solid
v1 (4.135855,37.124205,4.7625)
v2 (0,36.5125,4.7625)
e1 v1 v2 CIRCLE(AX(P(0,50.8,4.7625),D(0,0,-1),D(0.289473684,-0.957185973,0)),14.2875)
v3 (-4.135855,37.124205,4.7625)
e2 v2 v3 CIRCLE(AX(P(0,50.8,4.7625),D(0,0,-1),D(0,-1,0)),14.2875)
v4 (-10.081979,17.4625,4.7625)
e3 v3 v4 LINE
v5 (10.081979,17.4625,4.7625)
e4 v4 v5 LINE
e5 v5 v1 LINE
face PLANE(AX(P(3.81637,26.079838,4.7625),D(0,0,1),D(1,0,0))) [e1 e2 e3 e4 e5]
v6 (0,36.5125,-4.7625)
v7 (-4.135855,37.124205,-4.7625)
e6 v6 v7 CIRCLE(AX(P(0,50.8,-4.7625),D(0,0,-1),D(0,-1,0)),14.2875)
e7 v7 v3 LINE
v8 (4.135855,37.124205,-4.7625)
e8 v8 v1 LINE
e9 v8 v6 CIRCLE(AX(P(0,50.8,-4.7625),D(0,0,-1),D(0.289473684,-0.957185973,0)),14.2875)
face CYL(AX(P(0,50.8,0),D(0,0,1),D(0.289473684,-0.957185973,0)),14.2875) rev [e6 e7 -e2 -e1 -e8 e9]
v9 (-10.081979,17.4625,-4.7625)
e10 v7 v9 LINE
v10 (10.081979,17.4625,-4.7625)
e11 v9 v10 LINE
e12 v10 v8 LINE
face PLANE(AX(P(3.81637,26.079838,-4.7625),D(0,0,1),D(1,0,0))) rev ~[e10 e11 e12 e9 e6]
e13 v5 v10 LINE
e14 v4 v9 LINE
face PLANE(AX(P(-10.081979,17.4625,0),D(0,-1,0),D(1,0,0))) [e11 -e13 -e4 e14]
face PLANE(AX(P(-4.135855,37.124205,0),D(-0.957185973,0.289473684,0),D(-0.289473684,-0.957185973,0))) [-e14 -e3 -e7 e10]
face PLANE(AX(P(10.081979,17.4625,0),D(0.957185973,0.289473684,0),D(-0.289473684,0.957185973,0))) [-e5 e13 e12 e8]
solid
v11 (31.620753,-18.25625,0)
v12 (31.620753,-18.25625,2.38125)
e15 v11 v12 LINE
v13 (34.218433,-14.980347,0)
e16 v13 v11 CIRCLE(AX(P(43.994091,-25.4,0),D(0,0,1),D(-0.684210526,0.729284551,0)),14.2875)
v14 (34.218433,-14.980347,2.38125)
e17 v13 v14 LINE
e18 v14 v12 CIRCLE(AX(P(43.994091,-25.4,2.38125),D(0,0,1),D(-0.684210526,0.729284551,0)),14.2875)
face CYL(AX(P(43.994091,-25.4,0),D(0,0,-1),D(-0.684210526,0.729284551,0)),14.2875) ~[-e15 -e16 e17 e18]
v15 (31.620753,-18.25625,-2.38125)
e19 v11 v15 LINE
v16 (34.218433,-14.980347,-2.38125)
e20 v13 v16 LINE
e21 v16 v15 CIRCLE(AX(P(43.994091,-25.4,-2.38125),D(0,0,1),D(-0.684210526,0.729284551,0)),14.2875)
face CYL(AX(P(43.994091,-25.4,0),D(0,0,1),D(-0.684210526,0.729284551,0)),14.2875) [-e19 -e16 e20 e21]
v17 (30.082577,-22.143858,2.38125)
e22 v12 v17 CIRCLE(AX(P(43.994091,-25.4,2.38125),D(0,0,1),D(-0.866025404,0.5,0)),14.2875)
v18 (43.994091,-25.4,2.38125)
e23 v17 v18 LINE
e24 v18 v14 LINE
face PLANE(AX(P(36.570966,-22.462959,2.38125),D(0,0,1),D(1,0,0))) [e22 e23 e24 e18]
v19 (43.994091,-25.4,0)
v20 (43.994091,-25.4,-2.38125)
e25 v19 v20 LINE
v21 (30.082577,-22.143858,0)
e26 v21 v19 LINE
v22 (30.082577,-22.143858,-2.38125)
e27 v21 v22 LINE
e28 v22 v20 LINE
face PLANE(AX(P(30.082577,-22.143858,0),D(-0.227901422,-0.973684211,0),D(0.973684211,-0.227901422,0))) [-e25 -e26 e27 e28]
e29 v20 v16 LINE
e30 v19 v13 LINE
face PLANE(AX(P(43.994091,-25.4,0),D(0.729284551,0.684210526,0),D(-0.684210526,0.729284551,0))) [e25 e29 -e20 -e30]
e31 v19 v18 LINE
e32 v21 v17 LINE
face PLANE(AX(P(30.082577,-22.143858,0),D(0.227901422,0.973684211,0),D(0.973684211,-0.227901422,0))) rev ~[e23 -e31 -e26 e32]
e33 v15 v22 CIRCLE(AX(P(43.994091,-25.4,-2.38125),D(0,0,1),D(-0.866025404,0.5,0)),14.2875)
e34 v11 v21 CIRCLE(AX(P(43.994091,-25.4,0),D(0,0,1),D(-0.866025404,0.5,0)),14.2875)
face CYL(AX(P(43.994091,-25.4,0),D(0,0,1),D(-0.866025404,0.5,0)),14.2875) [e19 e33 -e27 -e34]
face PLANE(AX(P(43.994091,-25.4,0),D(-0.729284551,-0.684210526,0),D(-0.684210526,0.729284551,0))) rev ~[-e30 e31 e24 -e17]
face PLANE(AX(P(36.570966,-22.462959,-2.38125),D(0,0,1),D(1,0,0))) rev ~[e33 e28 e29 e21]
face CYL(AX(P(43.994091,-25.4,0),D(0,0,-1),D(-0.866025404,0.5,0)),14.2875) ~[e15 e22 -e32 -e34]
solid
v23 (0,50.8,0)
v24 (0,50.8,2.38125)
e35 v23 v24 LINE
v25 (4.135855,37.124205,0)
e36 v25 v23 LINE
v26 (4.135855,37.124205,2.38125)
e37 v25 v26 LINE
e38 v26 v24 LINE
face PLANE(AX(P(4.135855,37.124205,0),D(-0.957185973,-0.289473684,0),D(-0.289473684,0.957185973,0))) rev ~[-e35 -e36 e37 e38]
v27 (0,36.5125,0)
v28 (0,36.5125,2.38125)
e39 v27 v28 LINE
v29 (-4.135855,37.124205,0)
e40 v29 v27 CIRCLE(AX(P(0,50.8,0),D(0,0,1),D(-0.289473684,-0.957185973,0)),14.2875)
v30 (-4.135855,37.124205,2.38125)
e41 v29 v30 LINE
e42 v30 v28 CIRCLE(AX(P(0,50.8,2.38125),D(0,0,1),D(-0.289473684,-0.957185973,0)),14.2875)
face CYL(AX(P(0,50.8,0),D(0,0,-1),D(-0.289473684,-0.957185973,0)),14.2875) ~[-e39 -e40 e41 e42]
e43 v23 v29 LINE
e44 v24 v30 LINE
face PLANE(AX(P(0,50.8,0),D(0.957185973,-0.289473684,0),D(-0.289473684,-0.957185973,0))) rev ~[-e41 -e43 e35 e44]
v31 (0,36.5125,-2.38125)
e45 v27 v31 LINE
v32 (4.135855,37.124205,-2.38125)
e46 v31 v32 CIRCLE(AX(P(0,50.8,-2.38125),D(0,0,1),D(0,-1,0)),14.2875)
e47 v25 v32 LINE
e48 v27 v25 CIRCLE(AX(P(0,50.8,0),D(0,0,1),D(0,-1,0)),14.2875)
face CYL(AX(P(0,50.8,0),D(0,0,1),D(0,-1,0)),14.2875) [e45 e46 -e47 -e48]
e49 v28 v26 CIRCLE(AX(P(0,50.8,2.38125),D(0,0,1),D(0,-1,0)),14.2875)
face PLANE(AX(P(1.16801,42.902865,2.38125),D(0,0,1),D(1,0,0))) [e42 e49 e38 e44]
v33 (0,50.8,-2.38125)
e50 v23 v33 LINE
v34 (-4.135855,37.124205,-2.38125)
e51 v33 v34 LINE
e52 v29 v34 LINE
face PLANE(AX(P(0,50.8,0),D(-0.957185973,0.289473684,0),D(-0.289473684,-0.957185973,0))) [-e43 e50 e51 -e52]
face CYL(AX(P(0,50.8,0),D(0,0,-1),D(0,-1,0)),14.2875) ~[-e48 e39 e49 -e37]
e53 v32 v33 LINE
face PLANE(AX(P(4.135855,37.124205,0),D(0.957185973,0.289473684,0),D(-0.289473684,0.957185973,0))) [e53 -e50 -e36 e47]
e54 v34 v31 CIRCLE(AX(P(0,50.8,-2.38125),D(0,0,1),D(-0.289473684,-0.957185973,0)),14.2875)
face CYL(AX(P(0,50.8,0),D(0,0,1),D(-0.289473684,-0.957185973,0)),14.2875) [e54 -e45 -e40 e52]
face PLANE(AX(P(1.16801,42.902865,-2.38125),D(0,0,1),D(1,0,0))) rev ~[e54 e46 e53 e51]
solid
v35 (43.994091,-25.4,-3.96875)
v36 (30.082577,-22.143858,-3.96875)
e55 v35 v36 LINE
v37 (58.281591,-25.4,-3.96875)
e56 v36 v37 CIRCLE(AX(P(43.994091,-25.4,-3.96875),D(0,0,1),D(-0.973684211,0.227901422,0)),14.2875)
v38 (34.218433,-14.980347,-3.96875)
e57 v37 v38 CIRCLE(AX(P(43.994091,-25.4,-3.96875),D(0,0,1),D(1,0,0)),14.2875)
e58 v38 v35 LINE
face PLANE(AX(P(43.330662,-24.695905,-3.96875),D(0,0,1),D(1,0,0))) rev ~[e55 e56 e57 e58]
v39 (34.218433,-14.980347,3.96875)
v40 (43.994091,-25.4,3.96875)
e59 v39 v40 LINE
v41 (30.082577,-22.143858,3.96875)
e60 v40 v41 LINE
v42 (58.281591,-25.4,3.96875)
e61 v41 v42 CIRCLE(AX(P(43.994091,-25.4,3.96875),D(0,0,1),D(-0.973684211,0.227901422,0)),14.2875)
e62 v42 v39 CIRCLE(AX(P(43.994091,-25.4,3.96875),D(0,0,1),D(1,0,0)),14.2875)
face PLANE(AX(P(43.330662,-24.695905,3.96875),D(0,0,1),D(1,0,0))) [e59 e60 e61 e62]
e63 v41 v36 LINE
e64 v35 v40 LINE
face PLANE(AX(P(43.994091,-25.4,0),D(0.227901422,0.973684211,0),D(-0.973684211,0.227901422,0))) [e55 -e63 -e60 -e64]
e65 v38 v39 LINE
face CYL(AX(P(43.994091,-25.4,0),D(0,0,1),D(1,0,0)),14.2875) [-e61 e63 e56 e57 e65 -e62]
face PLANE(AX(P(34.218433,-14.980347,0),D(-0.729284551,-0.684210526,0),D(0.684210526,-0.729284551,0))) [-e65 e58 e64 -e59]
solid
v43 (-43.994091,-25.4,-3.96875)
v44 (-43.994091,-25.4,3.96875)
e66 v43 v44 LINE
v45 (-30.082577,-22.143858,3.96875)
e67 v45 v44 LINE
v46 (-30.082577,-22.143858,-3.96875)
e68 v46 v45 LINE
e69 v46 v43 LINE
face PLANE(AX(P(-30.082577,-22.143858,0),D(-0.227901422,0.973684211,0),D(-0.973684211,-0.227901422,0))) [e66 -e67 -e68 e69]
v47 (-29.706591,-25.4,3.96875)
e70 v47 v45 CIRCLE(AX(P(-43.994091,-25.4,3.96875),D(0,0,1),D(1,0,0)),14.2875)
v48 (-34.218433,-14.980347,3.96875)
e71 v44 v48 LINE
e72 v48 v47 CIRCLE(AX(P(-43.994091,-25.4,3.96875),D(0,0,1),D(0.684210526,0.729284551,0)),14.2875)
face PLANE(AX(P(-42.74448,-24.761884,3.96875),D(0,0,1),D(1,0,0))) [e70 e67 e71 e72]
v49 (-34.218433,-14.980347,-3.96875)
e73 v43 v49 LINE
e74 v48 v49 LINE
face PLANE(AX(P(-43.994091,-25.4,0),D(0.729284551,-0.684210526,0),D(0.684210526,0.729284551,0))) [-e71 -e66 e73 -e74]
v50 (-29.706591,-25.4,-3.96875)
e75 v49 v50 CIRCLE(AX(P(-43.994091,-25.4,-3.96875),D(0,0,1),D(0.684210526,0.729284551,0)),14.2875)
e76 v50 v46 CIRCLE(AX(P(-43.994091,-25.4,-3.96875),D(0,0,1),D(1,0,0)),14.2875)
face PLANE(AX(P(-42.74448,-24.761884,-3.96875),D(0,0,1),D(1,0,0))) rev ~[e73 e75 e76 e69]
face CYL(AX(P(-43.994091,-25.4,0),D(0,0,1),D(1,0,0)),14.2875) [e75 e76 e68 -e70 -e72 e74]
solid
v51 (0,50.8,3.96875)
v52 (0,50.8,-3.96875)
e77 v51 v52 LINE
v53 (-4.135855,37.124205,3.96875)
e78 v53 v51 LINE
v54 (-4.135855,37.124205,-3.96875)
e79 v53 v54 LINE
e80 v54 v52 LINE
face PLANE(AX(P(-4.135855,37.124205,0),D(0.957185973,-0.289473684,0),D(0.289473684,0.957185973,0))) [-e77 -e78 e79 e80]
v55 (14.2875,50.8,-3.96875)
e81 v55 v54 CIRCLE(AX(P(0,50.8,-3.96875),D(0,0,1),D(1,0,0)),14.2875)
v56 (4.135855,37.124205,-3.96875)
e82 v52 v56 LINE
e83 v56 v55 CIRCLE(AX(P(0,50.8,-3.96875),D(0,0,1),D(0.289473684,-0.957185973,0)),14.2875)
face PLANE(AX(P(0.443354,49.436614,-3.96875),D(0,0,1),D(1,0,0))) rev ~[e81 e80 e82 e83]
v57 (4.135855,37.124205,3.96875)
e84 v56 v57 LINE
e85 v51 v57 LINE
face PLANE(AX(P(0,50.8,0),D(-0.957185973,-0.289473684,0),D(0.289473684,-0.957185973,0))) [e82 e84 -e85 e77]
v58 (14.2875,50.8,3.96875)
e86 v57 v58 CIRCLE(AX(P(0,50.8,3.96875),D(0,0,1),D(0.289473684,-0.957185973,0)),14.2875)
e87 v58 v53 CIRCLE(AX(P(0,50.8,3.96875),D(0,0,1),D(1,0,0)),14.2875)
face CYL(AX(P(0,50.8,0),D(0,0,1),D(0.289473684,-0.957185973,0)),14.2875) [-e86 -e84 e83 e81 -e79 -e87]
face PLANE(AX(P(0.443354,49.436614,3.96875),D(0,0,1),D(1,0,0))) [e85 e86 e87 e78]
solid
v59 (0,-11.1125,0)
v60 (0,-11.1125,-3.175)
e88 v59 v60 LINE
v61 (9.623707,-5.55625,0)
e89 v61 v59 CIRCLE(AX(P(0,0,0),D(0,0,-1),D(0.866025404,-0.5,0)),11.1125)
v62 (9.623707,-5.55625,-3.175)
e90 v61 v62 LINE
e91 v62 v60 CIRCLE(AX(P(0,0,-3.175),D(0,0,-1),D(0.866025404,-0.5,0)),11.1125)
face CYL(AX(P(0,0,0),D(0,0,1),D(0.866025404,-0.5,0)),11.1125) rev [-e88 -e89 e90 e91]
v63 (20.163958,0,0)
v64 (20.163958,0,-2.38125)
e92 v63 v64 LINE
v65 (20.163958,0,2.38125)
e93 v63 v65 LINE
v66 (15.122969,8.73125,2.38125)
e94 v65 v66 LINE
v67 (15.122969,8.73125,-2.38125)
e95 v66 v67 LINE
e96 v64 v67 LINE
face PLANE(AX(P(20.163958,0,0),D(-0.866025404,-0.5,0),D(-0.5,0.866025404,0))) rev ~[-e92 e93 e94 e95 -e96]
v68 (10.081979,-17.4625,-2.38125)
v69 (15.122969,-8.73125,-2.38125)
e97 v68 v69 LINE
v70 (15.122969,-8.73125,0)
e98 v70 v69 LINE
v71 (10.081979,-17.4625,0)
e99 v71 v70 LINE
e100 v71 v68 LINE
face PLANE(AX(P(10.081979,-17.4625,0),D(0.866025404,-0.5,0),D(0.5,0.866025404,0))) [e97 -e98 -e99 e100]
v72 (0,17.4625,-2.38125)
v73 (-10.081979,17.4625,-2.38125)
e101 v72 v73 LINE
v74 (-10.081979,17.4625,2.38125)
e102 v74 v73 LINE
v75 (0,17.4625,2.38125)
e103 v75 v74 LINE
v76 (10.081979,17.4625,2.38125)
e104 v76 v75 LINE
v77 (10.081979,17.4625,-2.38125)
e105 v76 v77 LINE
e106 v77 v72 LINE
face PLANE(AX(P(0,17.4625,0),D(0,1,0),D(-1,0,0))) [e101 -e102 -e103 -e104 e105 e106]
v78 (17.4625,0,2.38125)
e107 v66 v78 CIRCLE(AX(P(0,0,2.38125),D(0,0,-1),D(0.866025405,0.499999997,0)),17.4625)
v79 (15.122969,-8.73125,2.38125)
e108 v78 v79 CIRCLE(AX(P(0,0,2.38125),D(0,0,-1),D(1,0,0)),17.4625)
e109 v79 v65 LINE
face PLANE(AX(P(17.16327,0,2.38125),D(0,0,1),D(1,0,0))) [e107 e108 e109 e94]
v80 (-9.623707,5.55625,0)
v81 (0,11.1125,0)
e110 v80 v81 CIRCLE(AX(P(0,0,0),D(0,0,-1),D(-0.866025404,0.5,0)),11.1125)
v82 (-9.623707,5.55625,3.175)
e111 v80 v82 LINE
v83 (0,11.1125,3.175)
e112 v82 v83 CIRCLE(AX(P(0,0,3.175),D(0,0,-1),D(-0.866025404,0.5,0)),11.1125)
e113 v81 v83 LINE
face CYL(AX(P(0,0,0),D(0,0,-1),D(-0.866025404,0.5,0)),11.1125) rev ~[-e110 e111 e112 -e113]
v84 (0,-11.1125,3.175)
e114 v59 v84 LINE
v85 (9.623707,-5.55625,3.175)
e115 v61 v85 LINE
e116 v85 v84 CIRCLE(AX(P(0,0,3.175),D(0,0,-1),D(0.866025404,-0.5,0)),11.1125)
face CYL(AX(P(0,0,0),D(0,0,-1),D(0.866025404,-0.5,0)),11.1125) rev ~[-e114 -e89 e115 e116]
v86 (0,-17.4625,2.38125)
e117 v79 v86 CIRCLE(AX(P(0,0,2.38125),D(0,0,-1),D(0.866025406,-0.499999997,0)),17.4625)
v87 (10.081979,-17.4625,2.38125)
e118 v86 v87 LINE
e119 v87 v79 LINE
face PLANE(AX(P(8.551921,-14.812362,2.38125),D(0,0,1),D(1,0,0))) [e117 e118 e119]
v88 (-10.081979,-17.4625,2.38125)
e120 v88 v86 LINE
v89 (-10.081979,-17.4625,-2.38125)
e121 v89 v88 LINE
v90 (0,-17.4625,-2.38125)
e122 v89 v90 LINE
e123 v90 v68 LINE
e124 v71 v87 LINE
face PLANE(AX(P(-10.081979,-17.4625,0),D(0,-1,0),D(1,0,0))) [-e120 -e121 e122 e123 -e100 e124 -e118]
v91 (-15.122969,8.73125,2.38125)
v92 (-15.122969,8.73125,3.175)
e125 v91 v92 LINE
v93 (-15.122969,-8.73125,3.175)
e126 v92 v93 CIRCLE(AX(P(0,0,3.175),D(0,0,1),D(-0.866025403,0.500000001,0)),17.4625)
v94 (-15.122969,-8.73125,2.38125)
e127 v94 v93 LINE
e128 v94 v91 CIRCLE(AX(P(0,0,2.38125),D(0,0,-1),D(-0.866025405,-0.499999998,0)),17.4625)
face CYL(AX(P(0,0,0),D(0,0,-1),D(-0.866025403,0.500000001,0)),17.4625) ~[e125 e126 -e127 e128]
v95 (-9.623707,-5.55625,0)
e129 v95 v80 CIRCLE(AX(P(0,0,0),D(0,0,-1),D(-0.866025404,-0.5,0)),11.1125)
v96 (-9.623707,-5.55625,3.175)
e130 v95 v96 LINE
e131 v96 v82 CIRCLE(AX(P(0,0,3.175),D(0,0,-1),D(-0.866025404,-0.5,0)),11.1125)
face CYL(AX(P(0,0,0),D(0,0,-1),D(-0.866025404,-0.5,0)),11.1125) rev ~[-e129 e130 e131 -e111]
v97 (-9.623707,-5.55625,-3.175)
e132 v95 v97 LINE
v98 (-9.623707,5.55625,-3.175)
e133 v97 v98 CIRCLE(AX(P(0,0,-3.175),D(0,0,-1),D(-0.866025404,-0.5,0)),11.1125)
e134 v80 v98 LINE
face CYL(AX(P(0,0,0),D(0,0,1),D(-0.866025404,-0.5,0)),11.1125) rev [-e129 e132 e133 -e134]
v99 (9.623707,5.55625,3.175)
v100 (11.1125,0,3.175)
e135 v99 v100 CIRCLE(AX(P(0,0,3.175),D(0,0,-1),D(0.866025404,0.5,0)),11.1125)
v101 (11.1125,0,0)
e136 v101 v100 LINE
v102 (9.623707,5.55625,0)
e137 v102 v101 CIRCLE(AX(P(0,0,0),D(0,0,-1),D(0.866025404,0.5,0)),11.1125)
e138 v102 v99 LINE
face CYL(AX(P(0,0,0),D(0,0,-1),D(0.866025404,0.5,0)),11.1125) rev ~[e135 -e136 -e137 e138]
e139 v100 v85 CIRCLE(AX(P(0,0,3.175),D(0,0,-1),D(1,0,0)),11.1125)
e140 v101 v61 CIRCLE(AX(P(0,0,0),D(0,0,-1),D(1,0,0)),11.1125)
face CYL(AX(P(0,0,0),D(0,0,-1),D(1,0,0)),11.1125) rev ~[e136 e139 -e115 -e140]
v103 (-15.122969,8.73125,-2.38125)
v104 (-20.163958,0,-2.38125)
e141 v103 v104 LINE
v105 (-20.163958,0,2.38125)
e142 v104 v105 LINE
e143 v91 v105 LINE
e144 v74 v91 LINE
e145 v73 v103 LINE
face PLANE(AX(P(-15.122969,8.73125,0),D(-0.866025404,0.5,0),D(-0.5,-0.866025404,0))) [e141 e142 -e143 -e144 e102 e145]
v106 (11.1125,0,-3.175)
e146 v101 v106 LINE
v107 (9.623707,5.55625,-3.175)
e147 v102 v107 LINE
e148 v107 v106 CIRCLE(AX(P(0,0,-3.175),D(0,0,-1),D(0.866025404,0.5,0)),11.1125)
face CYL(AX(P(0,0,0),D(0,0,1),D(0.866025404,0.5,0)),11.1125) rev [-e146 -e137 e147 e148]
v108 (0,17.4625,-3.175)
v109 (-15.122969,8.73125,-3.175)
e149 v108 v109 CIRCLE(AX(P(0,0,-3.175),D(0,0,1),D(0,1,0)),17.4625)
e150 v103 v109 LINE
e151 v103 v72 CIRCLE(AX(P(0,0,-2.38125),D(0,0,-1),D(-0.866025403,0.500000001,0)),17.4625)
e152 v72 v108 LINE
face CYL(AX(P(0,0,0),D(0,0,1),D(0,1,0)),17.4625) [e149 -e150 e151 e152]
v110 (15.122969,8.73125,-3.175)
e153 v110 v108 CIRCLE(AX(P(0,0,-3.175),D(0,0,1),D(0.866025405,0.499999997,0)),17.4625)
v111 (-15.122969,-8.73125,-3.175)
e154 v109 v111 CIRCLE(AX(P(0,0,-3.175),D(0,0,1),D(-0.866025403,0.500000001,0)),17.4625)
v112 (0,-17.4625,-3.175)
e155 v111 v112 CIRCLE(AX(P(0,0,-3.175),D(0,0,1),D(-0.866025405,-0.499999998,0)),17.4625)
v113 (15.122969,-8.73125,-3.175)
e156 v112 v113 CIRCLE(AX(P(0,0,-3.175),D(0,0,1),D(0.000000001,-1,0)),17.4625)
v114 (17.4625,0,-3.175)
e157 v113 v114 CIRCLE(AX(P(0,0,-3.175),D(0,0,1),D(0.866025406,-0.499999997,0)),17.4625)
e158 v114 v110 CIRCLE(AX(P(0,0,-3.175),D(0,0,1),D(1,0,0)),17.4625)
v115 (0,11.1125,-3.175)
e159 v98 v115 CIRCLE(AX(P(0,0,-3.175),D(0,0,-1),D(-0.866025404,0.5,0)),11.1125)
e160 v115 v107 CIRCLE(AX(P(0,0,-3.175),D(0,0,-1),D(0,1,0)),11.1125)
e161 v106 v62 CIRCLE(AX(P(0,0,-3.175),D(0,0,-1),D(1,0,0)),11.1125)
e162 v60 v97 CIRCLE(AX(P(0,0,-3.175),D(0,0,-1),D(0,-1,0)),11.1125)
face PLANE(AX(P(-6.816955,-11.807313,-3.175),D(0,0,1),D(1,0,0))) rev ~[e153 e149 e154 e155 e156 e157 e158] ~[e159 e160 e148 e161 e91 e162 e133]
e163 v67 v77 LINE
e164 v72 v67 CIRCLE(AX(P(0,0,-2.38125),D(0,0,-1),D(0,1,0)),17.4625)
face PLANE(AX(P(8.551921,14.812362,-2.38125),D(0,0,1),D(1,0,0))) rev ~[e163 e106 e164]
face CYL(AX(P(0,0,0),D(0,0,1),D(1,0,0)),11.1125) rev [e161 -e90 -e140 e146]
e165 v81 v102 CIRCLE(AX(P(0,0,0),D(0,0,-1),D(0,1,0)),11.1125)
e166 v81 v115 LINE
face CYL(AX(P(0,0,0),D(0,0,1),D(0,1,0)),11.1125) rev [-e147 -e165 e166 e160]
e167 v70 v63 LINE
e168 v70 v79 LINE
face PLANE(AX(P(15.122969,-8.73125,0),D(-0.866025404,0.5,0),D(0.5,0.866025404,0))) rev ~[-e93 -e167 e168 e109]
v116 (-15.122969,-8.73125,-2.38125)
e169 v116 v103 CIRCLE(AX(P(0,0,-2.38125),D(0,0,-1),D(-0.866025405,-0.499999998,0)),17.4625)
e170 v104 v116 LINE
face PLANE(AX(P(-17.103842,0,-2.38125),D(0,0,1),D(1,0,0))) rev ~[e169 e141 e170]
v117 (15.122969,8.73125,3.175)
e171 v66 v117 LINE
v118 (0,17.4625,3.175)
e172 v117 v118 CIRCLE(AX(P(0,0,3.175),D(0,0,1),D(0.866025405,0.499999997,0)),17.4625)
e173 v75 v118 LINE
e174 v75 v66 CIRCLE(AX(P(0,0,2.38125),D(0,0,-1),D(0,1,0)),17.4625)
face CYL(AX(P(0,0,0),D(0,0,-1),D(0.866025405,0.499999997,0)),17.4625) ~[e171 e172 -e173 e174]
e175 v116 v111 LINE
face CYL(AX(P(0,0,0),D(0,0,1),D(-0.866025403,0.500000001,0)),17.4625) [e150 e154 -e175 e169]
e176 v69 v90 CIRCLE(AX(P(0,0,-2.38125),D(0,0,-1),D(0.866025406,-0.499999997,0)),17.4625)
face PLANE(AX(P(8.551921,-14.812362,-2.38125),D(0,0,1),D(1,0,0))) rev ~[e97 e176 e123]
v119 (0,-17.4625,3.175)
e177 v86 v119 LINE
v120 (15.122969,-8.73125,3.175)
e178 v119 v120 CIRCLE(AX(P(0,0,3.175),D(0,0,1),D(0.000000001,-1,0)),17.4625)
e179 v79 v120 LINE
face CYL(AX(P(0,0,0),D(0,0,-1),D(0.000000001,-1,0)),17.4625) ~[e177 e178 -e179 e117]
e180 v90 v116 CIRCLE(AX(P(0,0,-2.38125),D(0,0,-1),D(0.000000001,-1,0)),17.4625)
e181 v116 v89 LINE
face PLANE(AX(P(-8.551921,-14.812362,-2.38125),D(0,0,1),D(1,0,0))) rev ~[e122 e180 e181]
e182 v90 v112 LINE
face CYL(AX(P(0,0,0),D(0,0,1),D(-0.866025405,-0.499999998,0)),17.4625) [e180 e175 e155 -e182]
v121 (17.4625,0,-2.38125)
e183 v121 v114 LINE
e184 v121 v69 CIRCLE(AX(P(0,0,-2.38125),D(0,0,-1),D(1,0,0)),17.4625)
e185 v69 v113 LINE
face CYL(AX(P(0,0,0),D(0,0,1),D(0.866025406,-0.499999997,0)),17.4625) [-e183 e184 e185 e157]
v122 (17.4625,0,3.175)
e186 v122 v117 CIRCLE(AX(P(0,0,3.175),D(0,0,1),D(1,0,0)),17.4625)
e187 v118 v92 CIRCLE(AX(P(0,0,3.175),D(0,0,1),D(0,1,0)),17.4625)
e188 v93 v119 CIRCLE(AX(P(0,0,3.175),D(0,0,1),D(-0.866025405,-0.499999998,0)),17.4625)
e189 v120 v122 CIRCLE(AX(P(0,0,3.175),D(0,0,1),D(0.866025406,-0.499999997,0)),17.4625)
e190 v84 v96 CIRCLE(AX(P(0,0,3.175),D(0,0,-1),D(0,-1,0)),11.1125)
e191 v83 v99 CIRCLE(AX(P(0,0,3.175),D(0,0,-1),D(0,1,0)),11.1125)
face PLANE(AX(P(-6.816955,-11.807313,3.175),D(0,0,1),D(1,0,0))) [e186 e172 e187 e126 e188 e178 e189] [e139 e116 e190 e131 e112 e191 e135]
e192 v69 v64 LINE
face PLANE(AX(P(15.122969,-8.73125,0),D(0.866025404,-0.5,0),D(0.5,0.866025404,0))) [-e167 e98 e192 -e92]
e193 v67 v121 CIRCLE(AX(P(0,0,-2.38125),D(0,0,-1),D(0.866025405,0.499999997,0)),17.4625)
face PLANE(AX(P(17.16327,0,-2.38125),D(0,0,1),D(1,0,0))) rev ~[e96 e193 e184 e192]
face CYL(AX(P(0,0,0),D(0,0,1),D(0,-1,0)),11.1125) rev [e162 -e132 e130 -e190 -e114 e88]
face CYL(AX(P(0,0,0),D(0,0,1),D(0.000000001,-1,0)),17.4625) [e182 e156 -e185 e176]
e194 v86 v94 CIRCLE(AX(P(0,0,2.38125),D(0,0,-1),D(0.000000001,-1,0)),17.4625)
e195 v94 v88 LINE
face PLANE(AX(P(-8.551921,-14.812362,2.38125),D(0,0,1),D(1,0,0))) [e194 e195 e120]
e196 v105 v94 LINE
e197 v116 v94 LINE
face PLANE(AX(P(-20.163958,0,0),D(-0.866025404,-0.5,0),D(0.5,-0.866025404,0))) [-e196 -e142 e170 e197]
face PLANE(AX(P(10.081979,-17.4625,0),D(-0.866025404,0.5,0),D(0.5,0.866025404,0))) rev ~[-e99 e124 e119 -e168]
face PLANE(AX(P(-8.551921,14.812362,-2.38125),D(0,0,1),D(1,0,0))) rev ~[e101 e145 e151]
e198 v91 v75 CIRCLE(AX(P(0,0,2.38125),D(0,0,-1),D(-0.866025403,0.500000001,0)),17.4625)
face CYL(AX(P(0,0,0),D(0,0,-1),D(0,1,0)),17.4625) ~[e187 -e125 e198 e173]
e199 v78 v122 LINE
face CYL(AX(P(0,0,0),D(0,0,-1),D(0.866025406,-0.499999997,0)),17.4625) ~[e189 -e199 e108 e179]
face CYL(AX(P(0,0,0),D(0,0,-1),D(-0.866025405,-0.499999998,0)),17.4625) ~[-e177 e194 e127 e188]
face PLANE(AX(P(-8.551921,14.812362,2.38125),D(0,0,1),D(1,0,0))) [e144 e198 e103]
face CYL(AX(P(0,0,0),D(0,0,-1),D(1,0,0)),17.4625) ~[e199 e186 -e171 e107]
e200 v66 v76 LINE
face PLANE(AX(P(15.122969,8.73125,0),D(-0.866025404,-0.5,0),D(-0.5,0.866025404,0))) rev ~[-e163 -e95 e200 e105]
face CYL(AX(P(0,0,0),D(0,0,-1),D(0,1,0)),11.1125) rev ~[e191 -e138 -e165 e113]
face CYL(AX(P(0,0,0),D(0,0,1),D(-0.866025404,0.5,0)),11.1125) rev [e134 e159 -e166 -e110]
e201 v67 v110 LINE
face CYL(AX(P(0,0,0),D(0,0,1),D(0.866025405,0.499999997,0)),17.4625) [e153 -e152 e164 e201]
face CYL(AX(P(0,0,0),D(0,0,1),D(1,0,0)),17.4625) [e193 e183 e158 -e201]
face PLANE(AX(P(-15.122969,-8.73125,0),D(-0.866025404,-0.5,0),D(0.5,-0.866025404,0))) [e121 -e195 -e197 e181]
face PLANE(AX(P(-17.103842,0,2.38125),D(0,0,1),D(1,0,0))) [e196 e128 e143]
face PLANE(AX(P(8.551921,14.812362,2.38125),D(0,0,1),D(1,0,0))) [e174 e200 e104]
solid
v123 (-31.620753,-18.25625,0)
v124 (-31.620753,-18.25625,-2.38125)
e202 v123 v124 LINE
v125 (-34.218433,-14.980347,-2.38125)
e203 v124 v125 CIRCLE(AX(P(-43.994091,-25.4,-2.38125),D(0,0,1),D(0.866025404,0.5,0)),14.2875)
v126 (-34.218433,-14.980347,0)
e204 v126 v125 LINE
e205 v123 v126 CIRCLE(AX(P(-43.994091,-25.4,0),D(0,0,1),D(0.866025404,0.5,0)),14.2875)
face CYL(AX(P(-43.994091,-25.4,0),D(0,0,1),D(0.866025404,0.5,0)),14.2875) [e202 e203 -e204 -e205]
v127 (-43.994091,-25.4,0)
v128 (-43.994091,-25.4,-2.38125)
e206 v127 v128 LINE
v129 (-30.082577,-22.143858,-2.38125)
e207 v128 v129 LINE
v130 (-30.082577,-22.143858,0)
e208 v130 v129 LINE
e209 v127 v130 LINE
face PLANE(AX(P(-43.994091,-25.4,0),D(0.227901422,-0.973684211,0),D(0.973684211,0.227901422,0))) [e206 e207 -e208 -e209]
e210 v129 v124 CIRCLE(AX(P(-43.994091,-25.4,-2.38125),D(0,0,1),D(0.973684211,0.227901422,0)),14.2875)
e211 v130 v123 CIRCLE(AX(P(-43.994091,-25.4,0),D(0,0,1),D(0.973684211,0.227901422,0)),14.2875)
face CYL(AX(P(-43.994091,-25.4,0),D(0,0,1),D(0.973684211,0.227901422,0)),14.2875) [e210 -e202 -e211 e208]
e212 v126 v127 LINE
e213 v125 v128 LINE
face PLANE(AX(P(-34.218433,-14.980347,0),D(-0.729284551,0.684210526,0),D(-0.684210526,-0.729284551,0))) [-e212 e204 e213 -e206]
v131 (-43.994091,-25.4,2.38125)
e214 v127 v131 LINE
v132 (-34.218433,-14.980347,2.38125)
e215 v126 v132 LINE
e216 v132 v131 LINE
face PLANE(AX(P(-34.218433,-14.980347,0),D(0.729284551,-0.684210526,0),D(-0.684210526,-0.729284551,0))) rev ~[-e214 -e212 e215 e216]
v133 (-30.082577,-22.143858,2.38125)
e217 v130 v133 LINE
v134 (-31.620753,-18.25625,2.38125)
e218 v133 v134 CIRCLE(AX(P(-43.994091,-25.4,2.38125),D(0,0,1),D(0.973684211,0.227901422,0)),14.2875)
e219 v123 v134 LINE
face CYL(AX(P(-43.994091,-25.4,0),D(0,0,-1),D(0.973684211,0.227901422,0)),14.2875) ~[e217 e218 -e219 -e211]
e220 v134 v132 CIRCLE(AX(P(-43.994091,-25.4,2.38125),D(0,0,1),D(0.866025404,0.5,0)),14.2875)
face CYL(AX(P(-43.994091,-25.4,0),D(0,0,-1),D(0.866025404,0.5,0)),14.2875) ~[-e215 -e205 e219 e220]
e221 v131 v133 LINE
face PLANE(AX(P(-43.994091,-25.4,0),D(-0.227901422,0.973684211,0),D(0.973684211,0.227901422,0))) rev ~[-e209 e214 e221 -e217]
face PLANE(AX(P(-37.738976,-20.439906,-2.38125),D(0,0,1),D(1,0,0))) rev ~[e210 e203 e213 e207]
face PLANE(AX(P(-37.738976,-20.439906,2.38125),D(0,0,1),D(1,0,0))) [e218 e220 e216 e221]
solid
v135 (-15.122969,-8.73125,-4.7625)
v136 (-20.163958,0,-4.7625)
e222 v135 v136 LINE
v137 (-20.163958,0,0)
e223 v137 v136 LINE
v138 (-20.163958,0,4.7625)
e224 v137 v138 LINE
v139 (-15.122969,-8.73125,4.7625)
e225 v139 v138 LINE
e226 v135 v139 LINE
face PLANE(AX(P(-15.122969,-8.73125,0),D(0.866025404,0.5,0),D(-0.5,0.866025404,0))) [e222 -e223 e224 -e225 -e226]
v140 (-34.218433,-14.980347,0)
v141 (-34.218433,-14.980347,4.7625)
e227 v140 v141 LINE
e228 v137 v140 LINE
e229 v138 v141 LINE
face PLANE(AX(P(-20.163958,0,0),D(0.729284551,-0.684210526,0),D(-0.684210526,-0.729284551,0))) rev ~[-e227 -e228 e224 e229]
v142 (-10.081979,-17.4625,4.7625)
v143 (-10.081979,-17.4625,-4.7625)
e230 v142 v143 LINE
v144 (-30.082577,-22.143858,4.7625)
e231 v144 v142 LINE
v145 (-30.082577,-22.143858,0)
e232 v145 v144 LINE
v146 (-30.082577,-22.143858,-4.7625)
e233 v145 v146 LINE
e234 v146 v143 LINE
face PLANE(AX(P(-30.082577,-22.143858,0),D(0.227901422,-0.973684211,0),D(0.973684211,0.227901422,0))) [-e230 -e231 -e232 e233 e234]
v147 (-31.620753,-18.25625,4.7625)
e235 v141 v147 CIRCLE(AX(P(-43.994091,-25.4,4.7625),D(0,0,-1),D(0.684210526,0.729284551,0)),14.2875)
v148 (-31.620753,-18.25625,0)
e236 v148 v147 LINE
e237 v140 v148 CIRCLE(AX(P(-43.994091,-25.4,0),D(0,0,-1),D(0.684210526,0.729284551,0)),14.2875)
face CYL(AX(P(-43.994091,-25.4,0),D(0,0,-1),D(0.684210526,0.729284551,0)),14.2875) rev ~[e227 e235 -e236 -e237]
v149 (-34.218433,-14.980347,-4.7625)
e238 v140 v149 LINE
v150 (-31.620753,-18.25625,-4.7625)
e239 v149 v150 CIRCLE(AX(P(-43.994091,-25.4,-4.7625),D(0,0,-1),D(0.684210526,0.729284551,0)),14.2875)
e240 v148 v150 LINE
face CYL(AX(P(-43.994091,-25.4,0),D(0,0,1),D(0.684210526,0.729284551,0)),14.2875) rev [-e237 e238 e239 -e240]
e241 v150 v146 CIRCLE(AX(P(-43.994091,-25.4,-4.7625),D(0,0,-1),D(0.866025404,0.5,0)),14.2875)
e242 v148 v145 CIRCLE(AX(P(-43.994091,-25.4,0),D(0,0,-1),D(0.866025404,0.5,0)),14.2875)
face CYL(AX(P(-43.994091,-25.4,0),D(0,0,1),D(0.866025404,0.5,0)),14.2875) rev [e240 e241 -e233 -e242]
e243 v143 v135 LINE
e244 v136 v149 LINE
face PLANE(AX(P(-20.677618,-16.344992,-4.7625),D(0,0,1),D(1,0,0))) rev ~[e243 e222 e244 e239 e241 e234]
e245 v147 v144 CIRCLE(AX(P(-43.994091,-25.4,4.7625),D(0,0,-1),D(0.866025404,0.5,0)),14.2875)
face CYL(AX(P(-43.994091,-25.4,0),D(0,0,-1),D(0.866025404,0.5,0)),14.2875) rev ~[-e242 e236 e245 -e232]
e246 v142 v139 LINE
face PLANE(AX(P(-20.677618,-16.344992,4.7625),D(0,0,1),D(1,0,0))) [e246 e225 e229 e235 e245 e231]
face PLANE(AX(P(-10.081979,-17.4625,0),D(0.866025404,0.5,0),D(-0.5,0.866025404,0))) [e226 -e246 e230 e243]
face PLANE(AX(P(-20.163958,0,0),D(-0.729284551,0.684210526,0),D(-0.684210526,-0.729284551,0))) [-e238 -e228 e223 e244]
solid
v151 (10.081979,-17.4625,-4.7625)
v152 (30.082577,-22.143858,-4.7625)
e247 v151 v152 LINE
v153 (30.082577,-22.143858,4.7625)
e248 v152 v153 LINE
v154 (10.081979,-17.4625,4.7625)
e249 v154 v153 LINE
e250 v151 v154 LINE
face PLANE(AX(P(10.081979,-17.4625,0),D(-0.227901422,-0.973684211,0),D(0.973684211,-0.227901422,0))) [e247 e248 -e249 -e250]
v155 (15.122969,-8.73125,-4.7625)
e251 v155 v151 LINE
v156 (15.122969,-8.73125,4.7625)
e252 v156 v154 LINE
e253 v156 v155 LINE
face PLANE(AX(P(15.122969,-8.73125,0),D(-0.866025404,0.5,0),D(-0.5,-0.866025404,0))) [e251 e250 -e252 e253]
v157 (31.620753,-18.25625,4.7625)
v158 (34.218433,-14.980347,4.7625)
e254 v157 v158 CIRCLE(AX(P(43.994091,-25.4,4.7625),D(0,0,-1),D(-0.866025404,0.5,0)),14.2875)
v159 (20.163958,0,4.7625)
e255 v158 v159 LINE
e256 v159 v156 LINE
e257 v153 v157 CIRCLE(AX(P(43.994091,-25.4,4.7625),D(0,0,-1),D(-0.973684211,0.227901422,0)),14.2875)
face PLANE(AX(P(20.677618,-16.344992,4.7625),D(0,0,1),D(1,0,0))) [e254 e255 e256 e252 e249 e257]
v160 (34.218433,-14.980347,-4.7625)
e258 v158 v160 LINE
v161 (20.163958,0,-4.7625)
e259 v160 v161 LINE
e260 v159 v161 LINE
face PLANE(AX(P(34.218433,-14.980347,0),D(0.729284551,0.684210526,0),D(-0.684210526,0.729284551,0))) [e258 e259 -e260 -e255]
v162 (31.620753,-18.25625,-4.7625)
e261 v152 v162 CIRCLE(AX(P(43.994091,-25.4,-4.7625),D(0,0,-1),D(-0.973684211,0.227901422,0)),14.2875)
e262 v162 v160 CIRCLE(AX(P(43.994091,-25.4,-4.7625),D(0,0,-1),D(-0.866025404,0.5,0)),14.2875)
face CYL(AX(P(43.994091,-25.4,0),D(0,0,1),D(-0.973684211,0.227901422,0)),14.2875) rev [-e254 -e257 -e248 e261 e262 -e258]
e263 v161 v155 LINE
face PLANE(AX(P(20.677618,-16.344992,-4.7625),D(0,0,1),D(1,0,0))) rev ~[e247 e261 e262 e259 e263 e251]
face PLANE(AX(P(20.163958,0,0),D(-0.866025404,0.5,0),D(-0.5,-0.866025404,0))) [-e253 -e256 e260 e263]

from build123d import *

# Parameters (mm, degrees)
F1_DEPTH      = 3.175
F1_DEPTH_BACK = 3.175
F2_DEPTH      = 2.38125
F2_DEPTH_BACK = 2.38125
F3_DEPTH      = 4.7625
F3_DEPTH_BACK = 4.7625
F4_DEPTH      = 3.96875
F4_DEPTH_BACK = 3.96875
F5_DEPTH      = 2.38125
F5_DEPTH_BACK = 2.38125


# Not quite as in the source:
# - a length typed as a fraction of an inch, garbled in the dataset ("3 / 203.2 mm" for 3/8 in), is restored


with BuildPart() as f1:
    # F0 (on Top) → F1 (new body, two sides)
    with BuildSketch(Plane.XY) as f1_sk:
        with BuildLine():
            Line((0, -17.4625), (0, -11.1125))
            ThreePointArc((0, -11.1125), (-5.55625, -9.6237072996), (-9.6237072996, -5.55625))
            Line((-9.6237072996, -5.55625), (-15.1229686136, -8.73125))
            ThreePointArc((-15.1229686303, -8.731249971), (-8.7312500094, -15.1229686082), (1.18e-08, -17.4625))
        make_face()
        with BuildLine():
            ThreePointArc((-9.6237072996, 5.55625), (-5.55625, 9.6237072996), (0, 11.1125))
            Line((0, 11.1125), (0, 17.4625))
            ThreePointArc((0, 17.4625), (-8.7312499932, 15.1229686175), (-15.1229686057, 8.7312500136))
            Line((-15.1229686136, 8.73125), (-9.6237072996, 5.55625))
        make_face()
        with BuildLine():
            ThreePointArc((-9.6237072996, -5.55625), (-11.1125, 0), (-9.6237072996, 5.55625))
            Line((-9.6237072996, 5.55625), (-15.1229686136, 8.73125))
            ThreePointArc((-15.1229686057, 8.7312500136), (-17.4625, 2.46e-08), (-15.1229686303, -8.731249971))
            Line((-15.1229686136, -8.73125), (-9.6237072996, -5.55625))
        make_face()
        with BuildLine():
            ThreePointArc((0, 11.1125), (5.55625, 9.6237072996), (9.6237072996, 5.55625))
            Line((9.6237072996, 5.55625), (15.1229686136, 8.73125))
            ThreePointArc((15.1229686421, 8.7312499507), (8.7312500247, 15.1229685993), (0, 17.4625))
            Line((0, 17.4625), (0, 11.1125))
        make_face()
        with BuildLine():
            ThreePointArc((9.6237072996, 5.55625), (10.7338507446, 2.8761266387), (11.1125, 0))
            ThreePointArc((11.1125, 0), (10.7338507446, -2.8761266387), (9.6237072996, -5.55625))
            Line((9.6237072996, -5.55625), (15.1229686136, -8.73125))
            ThreePointArc((15.1229686466, -8.7312499429), (16.8674797501, -4.5196275433), (17.4625, 0))
            ThreePointArc((17.4625, 0), (16.8674797489, 4.5196275476), (15.1229686421, 8.7312499507))
            Line((15.1229686136, 8.73125), (9.6237072996, 5.55625))
        make_face()
        with BuildLine():
            Line((15.1229686136, -8.73125), (9.6237072996, -5.55625))
            ThreePointArc((9.6237072996, -5.55625), (5.55625, -9.6237072996), (0, -11.1125))
            Line((0, -11.1125), (0, -17.4625))
            ThreePointArc((1.18e-08, -17.4625), (8.7312500336, -15.1229685942), (15.1229686466, -8.7312499429))
        make_face()
    extrude(amount=-F1_DEPTH)
    extrude(f1_sk.sketch, amount=F1_DEPTH_BACK)

    # F0 (on Top) → F2 (join, two sides)
    with BuildSketch(Plane.XY) as f2_sk:
        with BuildLine():
            ThreePointArc((-15.1229686303, -8.731249971), (-17.4625, 2.46e-08), (-15.1229686057, 8.7312500136))
            Line((-15.1229686057, 8.7312500136), (-20.1639581514, 0))
            Line((-20.1639581514, 0), (-15.1229686303, -8.731249971))
        make_face()
        with BuildLine():
            Line((-10.0819790757, -17.4625), (1.18e-08, -17.4625))
            ThreePointArc((1.18e-08, -17.4625), (-8.7312500094, -15.1229686082), (-15.1229686303, -8.731249971))
            Line((-15.1229686303, -8.731249971), (-10.0819790757, -17.4625))
        make_face()
        with BuildLine():
            ThreePointArc((-15.1229686057, 8.7312500136), (-8.7312499932, 15.1229686175), (0, 17.4625))
            Line((0, 17.4625), (-10.0819790757, 17.4625))
            Line((-10.0819790757, 17.4625), (-15.1229686057, 8.7312500136))
        make_face()
        with BuildLine():
            ThreePointArc((0, 17.4625), (8.7312500247, 15.1229685993), (15.1229686421, 8.7312499507))
            Line((15.1229686421, 8.7312499507), (10.0819790757, 17.4625))
            Line((10.0819790757, 17.4625), (0, 17.4625))
        make_face()
        with BuildLine():
            Line((10.0819790757, -17.4625), (15.1229686466, -8.7312499429))
            ThreePointArc((15.1229686466, -8.7312499429), (8.7312500336, -15.1229685942), (1.18e-08, -17.4625))
            Line((1.18e-08, -17.4625), (10.0819790757, -17.4625))
        make_face()
        with BuildLine():
            Line((20.1639581514, 0), (15.1229686421, 8.7312499507))
            ThreePointArc((15.1229686421, 8.7312499507), (16.8674797489, 4.5196275476), (17.4625, 0))
            ThreePointArc((17.4625, 0), (16.8674797501, -4.5196275433), (15.1229686466, -8.7312499429))
            Line((15.1229686466, -8.7312499429), (20.1639581514, 0))
        make_face()
    extrude(amount=F2_DEPTH)
    extrude(f2_sk.sketch, amount=-F2_DEPTH_BACK)


with BuildPart() as f3:
    # F0 (on Top) → F3 (new body, two sides)
    with BuildSketch(Plane.XY) as f3_sk:
        with BuildLine():
            Line((31.6207525557, -18.25625), (15.1229686136, -8.73125))
            Line((15.1229686466, -8.7312499429), (10.0819790757, -17.4625))
            Line((10.0819790757, -17.4625), (30.0825773544, -22.1438584325))
            ThreePointArc((30.0825773544, -22.1438584325), (30.7086953597, -20.1434867173), (31.6207525557, -18.25625))
        make_face()
        with BuildLine():
            Line((20.1639581514, 0), (15.1229686466, -8.7312499429))
            Line((15.1229686136, -8.73125), (31.6207525557, -18.25625))
            ThreePointArc((31.6207525557, -18.25625), (32.7991188978, -16.52276694), (34.2184326175, -14.9803469839))
            Line((34.2184326175, -14.9803469839), (20.1639581514, 0))
        make_face()
    extrude(amount=F3_DEPTH)
    extrude(f3_sk.sketch, amount=-F3_DEPTH_BACK)


with BuildPart() as f3b:
    # F0 (on Top) → F3, piece 2 (new body, two sides)
    with BuildSketch(Plane.XY) as f3_2_sk:
        with BuildLine():
            Line((0, 36.5125), (0, 17.4625))
            Line((0, 17.4625), (10.0819790757, 17.4625))
            Line((10.0819790757, 17.4625), (4.1358552632, 37.1242054164))
            ThreePointArc((4.1358552632, 37.1242054164), (2.0904235381, 36.6662536572), (0, 36.5125))
        make_face()
        with BuildLine():
            Line((-10.0819790757, 17.4625), (0, 17.4625))
            Line((0, 17.4625), (0, 36.5125))
            ThreePointArc((0, 36.5125), (-2.0904235381, 36.6662536572), (-4.1358552632, 37.1242054164))
            Line((-4.1358552632, 37.1242054164), (-10.0819790757, 17.4625))
        make_face()
    extrude(amount=F3_DEPTH)
    extrude(f3_2_sk.sketch, amount=-F3_DEPTH_BACK)


with BuildPart() as f3c:
    # F0 (on Top) → F3, piece 3 (new body, two sides)
    with BuildSketch(Plane.XY) as f3_3_sk:
        with BuildLine():
            Line((-10.0819790757, -17.4625), (-15.1229686303, -8.731249971))
            Line((-15.1229686136, -8.73125), (-31.6207525557, -18.25625))
            ThreePointArc((-31.6207525557, -18.25625), (-30.7086953597, -20.1434867173), (-30.0825773544, -22.1438584325))
            Line((-30.0825773544, -22.1438584325), (-10.0819790757, -17.4625))
        make_face()
        with BuildLine():
            Line((-31.6207525557, -18.25625), (-15.1229686136, -8.73125))
            Line((-15.1229686303, -8.731249971), (-20.1639581514, 0))
            Line((-20.1639581514, 0), (-34.2184326175, -14.9803469839))
            ThreePointArc((-34.2184326175, -14.9803469839), (-32.7991188978, -16.52276694), (-31.6207525557, -18.25625))
        make_face()
    extrude(amount=F3_DEPTH)
    extrude(f3_3_sk.sketch, amount=-F3_DEPTH_BACK)


with BuildPart() as f4:
    # F0 (on Top) → F4 (new body, two sides)
    with BuildSketch(Plane.XY) as f4_sk:
        with BuildLine():
            Line((0, 50.8), (4.1358552632, 37.1242054164))
            ThreePointArc((4.1358552632, 37.1242054164), (11.4722205419, 42.2840847768), (14.2875, 50.8))
            ThreePointArc((14.2875, 50.8), (-8.5159152232, 62.2722205419), (-4.1358552632, 37.1242054164))
            Line((-4.1358552632, 37.1242054164), (0, 50.8))
        make_face()
    extrude(amount=F4_DEPTH)
    extrude(f4_sk.sketch, amount=-F4_DEPTH_BACK)


with BuildPart() as f4b:
    # F0 (on Top) → F4, piece 2 (new body, two sides)
    with BuildSketch(Plane.XY) as f4_2_sk:
        with BuildLine():
            ThreePointArc((-29.7065905122, -25.4), (-29.8008984736, -23.7611113512), (-30.0825773544, -22.1438584325))
            Line((-30.0825773544, -22.1438584325), (-43.9940905122, -25.4))
            Line((-43.9940905122, -25.4), (-34.2184326175, -14.9803469839))
            ThreePointArc((-34.2184326175, -14.9803469839), (-57.105199703, -31.0772768155), (-29.7065905122, -25.4))
        make_face()
    extrude(amount=F4_DEPTH)
    extrude(f4_2_sk.sketch, amount=-F4_DEPTH_BACK)


with BuildPart() as f4c:
    # F0 (on Top) → F4, piece 3 (new body, two sides)
    with BuildSketch(Plane.XY) as f4_3_sk:
        with BuildLine():
            ThreePointArc((58.2815905122, -25.4), (49.6713673277, -12.2888908093), (34.2184326175, -14.9803469839))
            Line((34.2184326175, -14.9803469839), (43.9940905122, -25.4))
            Line((43.9940905122, -25.4), (30.0825773544, -22.1438584325))
            ThreePointArc((30.0825773544, -22.1438584325), (42.3552018634, -39.5931920387), (58.2815905122, -25.4))
        make_face()
    extrude(amount=F4_DEPTH)
    extrude(f4_3_sk.sketch, amount=-F4_DEPTH_BACK)


with BuildPart() as f5:
    # F0 (on Top) → F5 (new body, two sides)
    with BuildSketch(Plane.XY) as f5_sk:
        with BuildLine():
            Line((43.9940905122, -25.4), (31.6207525557, -18.25625))
            ThreePointArc((31.6207525557, -18.25625), (30.7086953597, -20.1434867173), (30.0825773544, -22.1438584325))
            Line((30.0825773544, -22.1438584325), (43.9940905122, -25.4))
        make_face()
        with BuildLine():
            ThreePointArc((34.2184326175, -14.9803469839), (32.7991188978, -16.52276694), (31.6207525557, -18.25625))
            Line((31.6207525557, -18.25625), (43.9940905122, -25.4))
            Line((43.9940905122, -25.4), (34.2184326175, -14.9803469839))
        make_face()
    extrude(amount=F5_DEPTH)
    extrude(f5_sk.sketch, amount=-F5_DEPTH_BACK)


with BuildPart() as f5b:
    # F0 (on Top) → F5, piece 2 (new body, two sides)
    with BuildSketch(Plane.XY) as f5_2_sk:
        with BuildLine():
            Line((0, 50.8), (0, 36.5125))
            ThreePointArc((0, 36.5125), (2.0904235381, 36.6662536572), (4.1358552632, 37.1242054164))
            Line((4.1358552632, 37.1242054164), (0, 50.8))
        make_face()
        with BuildLine():
            ThreePointArc((-4.1358552632, 37.1242054164), (-2.0904235381, 36.6662536572), (0, 36.5125))
            Line((0, 36.5125), (0, 50.8))
            Line((0, 50.8), (-4.1358552632, 37.1242054164))
        make_face()
    extrude(amount=F5_DEPTH)
    extrude(f5_2_sk.sketch, amount=-F5_DEPTH_BACK)


with BuildPart() as f5c:
    # F0 (on Top) → F5, piece 3 (new body, two sides)
    with BuildSketch(Plane.XY) as f5_3_sk:
        with BuildLine():
            Line((-43.9940905122, -25.4), (-31.6207525557, -18.25625))
            ThreePointArc((-31.6207525557, -18.25625), (-32.7991188978, -16.52276694), (-34.2184326175, -14.9803469839))
            Line((-34.2184326175, -14.9803469839), (-43.9940905122, -25.4))
        make_face()
        with BuildLine():
            ThreePointArc((-30.0825773544, -22.1438584325), (-30.7086953597, -20.1434867173), (-31.6207525557, -18.25625))
            Line((-31.6207525557, -18.25625), (-43.9940905122, -25.4))
            Line((-43.9940905122, -25.4), (-30.0825773544, -22.1438584325))
        make_face()
    extrude(amount=F5_DEPTH)
    extrude(f5_3_sk.sketch, amount=-F5_DEPTH_BACK)


solid = Compound([f1.part, f3.part, f3b.part, f3c.part, f4.part, f4b.part, f4c.part, f5.part, f5b.part, f5c.part])
